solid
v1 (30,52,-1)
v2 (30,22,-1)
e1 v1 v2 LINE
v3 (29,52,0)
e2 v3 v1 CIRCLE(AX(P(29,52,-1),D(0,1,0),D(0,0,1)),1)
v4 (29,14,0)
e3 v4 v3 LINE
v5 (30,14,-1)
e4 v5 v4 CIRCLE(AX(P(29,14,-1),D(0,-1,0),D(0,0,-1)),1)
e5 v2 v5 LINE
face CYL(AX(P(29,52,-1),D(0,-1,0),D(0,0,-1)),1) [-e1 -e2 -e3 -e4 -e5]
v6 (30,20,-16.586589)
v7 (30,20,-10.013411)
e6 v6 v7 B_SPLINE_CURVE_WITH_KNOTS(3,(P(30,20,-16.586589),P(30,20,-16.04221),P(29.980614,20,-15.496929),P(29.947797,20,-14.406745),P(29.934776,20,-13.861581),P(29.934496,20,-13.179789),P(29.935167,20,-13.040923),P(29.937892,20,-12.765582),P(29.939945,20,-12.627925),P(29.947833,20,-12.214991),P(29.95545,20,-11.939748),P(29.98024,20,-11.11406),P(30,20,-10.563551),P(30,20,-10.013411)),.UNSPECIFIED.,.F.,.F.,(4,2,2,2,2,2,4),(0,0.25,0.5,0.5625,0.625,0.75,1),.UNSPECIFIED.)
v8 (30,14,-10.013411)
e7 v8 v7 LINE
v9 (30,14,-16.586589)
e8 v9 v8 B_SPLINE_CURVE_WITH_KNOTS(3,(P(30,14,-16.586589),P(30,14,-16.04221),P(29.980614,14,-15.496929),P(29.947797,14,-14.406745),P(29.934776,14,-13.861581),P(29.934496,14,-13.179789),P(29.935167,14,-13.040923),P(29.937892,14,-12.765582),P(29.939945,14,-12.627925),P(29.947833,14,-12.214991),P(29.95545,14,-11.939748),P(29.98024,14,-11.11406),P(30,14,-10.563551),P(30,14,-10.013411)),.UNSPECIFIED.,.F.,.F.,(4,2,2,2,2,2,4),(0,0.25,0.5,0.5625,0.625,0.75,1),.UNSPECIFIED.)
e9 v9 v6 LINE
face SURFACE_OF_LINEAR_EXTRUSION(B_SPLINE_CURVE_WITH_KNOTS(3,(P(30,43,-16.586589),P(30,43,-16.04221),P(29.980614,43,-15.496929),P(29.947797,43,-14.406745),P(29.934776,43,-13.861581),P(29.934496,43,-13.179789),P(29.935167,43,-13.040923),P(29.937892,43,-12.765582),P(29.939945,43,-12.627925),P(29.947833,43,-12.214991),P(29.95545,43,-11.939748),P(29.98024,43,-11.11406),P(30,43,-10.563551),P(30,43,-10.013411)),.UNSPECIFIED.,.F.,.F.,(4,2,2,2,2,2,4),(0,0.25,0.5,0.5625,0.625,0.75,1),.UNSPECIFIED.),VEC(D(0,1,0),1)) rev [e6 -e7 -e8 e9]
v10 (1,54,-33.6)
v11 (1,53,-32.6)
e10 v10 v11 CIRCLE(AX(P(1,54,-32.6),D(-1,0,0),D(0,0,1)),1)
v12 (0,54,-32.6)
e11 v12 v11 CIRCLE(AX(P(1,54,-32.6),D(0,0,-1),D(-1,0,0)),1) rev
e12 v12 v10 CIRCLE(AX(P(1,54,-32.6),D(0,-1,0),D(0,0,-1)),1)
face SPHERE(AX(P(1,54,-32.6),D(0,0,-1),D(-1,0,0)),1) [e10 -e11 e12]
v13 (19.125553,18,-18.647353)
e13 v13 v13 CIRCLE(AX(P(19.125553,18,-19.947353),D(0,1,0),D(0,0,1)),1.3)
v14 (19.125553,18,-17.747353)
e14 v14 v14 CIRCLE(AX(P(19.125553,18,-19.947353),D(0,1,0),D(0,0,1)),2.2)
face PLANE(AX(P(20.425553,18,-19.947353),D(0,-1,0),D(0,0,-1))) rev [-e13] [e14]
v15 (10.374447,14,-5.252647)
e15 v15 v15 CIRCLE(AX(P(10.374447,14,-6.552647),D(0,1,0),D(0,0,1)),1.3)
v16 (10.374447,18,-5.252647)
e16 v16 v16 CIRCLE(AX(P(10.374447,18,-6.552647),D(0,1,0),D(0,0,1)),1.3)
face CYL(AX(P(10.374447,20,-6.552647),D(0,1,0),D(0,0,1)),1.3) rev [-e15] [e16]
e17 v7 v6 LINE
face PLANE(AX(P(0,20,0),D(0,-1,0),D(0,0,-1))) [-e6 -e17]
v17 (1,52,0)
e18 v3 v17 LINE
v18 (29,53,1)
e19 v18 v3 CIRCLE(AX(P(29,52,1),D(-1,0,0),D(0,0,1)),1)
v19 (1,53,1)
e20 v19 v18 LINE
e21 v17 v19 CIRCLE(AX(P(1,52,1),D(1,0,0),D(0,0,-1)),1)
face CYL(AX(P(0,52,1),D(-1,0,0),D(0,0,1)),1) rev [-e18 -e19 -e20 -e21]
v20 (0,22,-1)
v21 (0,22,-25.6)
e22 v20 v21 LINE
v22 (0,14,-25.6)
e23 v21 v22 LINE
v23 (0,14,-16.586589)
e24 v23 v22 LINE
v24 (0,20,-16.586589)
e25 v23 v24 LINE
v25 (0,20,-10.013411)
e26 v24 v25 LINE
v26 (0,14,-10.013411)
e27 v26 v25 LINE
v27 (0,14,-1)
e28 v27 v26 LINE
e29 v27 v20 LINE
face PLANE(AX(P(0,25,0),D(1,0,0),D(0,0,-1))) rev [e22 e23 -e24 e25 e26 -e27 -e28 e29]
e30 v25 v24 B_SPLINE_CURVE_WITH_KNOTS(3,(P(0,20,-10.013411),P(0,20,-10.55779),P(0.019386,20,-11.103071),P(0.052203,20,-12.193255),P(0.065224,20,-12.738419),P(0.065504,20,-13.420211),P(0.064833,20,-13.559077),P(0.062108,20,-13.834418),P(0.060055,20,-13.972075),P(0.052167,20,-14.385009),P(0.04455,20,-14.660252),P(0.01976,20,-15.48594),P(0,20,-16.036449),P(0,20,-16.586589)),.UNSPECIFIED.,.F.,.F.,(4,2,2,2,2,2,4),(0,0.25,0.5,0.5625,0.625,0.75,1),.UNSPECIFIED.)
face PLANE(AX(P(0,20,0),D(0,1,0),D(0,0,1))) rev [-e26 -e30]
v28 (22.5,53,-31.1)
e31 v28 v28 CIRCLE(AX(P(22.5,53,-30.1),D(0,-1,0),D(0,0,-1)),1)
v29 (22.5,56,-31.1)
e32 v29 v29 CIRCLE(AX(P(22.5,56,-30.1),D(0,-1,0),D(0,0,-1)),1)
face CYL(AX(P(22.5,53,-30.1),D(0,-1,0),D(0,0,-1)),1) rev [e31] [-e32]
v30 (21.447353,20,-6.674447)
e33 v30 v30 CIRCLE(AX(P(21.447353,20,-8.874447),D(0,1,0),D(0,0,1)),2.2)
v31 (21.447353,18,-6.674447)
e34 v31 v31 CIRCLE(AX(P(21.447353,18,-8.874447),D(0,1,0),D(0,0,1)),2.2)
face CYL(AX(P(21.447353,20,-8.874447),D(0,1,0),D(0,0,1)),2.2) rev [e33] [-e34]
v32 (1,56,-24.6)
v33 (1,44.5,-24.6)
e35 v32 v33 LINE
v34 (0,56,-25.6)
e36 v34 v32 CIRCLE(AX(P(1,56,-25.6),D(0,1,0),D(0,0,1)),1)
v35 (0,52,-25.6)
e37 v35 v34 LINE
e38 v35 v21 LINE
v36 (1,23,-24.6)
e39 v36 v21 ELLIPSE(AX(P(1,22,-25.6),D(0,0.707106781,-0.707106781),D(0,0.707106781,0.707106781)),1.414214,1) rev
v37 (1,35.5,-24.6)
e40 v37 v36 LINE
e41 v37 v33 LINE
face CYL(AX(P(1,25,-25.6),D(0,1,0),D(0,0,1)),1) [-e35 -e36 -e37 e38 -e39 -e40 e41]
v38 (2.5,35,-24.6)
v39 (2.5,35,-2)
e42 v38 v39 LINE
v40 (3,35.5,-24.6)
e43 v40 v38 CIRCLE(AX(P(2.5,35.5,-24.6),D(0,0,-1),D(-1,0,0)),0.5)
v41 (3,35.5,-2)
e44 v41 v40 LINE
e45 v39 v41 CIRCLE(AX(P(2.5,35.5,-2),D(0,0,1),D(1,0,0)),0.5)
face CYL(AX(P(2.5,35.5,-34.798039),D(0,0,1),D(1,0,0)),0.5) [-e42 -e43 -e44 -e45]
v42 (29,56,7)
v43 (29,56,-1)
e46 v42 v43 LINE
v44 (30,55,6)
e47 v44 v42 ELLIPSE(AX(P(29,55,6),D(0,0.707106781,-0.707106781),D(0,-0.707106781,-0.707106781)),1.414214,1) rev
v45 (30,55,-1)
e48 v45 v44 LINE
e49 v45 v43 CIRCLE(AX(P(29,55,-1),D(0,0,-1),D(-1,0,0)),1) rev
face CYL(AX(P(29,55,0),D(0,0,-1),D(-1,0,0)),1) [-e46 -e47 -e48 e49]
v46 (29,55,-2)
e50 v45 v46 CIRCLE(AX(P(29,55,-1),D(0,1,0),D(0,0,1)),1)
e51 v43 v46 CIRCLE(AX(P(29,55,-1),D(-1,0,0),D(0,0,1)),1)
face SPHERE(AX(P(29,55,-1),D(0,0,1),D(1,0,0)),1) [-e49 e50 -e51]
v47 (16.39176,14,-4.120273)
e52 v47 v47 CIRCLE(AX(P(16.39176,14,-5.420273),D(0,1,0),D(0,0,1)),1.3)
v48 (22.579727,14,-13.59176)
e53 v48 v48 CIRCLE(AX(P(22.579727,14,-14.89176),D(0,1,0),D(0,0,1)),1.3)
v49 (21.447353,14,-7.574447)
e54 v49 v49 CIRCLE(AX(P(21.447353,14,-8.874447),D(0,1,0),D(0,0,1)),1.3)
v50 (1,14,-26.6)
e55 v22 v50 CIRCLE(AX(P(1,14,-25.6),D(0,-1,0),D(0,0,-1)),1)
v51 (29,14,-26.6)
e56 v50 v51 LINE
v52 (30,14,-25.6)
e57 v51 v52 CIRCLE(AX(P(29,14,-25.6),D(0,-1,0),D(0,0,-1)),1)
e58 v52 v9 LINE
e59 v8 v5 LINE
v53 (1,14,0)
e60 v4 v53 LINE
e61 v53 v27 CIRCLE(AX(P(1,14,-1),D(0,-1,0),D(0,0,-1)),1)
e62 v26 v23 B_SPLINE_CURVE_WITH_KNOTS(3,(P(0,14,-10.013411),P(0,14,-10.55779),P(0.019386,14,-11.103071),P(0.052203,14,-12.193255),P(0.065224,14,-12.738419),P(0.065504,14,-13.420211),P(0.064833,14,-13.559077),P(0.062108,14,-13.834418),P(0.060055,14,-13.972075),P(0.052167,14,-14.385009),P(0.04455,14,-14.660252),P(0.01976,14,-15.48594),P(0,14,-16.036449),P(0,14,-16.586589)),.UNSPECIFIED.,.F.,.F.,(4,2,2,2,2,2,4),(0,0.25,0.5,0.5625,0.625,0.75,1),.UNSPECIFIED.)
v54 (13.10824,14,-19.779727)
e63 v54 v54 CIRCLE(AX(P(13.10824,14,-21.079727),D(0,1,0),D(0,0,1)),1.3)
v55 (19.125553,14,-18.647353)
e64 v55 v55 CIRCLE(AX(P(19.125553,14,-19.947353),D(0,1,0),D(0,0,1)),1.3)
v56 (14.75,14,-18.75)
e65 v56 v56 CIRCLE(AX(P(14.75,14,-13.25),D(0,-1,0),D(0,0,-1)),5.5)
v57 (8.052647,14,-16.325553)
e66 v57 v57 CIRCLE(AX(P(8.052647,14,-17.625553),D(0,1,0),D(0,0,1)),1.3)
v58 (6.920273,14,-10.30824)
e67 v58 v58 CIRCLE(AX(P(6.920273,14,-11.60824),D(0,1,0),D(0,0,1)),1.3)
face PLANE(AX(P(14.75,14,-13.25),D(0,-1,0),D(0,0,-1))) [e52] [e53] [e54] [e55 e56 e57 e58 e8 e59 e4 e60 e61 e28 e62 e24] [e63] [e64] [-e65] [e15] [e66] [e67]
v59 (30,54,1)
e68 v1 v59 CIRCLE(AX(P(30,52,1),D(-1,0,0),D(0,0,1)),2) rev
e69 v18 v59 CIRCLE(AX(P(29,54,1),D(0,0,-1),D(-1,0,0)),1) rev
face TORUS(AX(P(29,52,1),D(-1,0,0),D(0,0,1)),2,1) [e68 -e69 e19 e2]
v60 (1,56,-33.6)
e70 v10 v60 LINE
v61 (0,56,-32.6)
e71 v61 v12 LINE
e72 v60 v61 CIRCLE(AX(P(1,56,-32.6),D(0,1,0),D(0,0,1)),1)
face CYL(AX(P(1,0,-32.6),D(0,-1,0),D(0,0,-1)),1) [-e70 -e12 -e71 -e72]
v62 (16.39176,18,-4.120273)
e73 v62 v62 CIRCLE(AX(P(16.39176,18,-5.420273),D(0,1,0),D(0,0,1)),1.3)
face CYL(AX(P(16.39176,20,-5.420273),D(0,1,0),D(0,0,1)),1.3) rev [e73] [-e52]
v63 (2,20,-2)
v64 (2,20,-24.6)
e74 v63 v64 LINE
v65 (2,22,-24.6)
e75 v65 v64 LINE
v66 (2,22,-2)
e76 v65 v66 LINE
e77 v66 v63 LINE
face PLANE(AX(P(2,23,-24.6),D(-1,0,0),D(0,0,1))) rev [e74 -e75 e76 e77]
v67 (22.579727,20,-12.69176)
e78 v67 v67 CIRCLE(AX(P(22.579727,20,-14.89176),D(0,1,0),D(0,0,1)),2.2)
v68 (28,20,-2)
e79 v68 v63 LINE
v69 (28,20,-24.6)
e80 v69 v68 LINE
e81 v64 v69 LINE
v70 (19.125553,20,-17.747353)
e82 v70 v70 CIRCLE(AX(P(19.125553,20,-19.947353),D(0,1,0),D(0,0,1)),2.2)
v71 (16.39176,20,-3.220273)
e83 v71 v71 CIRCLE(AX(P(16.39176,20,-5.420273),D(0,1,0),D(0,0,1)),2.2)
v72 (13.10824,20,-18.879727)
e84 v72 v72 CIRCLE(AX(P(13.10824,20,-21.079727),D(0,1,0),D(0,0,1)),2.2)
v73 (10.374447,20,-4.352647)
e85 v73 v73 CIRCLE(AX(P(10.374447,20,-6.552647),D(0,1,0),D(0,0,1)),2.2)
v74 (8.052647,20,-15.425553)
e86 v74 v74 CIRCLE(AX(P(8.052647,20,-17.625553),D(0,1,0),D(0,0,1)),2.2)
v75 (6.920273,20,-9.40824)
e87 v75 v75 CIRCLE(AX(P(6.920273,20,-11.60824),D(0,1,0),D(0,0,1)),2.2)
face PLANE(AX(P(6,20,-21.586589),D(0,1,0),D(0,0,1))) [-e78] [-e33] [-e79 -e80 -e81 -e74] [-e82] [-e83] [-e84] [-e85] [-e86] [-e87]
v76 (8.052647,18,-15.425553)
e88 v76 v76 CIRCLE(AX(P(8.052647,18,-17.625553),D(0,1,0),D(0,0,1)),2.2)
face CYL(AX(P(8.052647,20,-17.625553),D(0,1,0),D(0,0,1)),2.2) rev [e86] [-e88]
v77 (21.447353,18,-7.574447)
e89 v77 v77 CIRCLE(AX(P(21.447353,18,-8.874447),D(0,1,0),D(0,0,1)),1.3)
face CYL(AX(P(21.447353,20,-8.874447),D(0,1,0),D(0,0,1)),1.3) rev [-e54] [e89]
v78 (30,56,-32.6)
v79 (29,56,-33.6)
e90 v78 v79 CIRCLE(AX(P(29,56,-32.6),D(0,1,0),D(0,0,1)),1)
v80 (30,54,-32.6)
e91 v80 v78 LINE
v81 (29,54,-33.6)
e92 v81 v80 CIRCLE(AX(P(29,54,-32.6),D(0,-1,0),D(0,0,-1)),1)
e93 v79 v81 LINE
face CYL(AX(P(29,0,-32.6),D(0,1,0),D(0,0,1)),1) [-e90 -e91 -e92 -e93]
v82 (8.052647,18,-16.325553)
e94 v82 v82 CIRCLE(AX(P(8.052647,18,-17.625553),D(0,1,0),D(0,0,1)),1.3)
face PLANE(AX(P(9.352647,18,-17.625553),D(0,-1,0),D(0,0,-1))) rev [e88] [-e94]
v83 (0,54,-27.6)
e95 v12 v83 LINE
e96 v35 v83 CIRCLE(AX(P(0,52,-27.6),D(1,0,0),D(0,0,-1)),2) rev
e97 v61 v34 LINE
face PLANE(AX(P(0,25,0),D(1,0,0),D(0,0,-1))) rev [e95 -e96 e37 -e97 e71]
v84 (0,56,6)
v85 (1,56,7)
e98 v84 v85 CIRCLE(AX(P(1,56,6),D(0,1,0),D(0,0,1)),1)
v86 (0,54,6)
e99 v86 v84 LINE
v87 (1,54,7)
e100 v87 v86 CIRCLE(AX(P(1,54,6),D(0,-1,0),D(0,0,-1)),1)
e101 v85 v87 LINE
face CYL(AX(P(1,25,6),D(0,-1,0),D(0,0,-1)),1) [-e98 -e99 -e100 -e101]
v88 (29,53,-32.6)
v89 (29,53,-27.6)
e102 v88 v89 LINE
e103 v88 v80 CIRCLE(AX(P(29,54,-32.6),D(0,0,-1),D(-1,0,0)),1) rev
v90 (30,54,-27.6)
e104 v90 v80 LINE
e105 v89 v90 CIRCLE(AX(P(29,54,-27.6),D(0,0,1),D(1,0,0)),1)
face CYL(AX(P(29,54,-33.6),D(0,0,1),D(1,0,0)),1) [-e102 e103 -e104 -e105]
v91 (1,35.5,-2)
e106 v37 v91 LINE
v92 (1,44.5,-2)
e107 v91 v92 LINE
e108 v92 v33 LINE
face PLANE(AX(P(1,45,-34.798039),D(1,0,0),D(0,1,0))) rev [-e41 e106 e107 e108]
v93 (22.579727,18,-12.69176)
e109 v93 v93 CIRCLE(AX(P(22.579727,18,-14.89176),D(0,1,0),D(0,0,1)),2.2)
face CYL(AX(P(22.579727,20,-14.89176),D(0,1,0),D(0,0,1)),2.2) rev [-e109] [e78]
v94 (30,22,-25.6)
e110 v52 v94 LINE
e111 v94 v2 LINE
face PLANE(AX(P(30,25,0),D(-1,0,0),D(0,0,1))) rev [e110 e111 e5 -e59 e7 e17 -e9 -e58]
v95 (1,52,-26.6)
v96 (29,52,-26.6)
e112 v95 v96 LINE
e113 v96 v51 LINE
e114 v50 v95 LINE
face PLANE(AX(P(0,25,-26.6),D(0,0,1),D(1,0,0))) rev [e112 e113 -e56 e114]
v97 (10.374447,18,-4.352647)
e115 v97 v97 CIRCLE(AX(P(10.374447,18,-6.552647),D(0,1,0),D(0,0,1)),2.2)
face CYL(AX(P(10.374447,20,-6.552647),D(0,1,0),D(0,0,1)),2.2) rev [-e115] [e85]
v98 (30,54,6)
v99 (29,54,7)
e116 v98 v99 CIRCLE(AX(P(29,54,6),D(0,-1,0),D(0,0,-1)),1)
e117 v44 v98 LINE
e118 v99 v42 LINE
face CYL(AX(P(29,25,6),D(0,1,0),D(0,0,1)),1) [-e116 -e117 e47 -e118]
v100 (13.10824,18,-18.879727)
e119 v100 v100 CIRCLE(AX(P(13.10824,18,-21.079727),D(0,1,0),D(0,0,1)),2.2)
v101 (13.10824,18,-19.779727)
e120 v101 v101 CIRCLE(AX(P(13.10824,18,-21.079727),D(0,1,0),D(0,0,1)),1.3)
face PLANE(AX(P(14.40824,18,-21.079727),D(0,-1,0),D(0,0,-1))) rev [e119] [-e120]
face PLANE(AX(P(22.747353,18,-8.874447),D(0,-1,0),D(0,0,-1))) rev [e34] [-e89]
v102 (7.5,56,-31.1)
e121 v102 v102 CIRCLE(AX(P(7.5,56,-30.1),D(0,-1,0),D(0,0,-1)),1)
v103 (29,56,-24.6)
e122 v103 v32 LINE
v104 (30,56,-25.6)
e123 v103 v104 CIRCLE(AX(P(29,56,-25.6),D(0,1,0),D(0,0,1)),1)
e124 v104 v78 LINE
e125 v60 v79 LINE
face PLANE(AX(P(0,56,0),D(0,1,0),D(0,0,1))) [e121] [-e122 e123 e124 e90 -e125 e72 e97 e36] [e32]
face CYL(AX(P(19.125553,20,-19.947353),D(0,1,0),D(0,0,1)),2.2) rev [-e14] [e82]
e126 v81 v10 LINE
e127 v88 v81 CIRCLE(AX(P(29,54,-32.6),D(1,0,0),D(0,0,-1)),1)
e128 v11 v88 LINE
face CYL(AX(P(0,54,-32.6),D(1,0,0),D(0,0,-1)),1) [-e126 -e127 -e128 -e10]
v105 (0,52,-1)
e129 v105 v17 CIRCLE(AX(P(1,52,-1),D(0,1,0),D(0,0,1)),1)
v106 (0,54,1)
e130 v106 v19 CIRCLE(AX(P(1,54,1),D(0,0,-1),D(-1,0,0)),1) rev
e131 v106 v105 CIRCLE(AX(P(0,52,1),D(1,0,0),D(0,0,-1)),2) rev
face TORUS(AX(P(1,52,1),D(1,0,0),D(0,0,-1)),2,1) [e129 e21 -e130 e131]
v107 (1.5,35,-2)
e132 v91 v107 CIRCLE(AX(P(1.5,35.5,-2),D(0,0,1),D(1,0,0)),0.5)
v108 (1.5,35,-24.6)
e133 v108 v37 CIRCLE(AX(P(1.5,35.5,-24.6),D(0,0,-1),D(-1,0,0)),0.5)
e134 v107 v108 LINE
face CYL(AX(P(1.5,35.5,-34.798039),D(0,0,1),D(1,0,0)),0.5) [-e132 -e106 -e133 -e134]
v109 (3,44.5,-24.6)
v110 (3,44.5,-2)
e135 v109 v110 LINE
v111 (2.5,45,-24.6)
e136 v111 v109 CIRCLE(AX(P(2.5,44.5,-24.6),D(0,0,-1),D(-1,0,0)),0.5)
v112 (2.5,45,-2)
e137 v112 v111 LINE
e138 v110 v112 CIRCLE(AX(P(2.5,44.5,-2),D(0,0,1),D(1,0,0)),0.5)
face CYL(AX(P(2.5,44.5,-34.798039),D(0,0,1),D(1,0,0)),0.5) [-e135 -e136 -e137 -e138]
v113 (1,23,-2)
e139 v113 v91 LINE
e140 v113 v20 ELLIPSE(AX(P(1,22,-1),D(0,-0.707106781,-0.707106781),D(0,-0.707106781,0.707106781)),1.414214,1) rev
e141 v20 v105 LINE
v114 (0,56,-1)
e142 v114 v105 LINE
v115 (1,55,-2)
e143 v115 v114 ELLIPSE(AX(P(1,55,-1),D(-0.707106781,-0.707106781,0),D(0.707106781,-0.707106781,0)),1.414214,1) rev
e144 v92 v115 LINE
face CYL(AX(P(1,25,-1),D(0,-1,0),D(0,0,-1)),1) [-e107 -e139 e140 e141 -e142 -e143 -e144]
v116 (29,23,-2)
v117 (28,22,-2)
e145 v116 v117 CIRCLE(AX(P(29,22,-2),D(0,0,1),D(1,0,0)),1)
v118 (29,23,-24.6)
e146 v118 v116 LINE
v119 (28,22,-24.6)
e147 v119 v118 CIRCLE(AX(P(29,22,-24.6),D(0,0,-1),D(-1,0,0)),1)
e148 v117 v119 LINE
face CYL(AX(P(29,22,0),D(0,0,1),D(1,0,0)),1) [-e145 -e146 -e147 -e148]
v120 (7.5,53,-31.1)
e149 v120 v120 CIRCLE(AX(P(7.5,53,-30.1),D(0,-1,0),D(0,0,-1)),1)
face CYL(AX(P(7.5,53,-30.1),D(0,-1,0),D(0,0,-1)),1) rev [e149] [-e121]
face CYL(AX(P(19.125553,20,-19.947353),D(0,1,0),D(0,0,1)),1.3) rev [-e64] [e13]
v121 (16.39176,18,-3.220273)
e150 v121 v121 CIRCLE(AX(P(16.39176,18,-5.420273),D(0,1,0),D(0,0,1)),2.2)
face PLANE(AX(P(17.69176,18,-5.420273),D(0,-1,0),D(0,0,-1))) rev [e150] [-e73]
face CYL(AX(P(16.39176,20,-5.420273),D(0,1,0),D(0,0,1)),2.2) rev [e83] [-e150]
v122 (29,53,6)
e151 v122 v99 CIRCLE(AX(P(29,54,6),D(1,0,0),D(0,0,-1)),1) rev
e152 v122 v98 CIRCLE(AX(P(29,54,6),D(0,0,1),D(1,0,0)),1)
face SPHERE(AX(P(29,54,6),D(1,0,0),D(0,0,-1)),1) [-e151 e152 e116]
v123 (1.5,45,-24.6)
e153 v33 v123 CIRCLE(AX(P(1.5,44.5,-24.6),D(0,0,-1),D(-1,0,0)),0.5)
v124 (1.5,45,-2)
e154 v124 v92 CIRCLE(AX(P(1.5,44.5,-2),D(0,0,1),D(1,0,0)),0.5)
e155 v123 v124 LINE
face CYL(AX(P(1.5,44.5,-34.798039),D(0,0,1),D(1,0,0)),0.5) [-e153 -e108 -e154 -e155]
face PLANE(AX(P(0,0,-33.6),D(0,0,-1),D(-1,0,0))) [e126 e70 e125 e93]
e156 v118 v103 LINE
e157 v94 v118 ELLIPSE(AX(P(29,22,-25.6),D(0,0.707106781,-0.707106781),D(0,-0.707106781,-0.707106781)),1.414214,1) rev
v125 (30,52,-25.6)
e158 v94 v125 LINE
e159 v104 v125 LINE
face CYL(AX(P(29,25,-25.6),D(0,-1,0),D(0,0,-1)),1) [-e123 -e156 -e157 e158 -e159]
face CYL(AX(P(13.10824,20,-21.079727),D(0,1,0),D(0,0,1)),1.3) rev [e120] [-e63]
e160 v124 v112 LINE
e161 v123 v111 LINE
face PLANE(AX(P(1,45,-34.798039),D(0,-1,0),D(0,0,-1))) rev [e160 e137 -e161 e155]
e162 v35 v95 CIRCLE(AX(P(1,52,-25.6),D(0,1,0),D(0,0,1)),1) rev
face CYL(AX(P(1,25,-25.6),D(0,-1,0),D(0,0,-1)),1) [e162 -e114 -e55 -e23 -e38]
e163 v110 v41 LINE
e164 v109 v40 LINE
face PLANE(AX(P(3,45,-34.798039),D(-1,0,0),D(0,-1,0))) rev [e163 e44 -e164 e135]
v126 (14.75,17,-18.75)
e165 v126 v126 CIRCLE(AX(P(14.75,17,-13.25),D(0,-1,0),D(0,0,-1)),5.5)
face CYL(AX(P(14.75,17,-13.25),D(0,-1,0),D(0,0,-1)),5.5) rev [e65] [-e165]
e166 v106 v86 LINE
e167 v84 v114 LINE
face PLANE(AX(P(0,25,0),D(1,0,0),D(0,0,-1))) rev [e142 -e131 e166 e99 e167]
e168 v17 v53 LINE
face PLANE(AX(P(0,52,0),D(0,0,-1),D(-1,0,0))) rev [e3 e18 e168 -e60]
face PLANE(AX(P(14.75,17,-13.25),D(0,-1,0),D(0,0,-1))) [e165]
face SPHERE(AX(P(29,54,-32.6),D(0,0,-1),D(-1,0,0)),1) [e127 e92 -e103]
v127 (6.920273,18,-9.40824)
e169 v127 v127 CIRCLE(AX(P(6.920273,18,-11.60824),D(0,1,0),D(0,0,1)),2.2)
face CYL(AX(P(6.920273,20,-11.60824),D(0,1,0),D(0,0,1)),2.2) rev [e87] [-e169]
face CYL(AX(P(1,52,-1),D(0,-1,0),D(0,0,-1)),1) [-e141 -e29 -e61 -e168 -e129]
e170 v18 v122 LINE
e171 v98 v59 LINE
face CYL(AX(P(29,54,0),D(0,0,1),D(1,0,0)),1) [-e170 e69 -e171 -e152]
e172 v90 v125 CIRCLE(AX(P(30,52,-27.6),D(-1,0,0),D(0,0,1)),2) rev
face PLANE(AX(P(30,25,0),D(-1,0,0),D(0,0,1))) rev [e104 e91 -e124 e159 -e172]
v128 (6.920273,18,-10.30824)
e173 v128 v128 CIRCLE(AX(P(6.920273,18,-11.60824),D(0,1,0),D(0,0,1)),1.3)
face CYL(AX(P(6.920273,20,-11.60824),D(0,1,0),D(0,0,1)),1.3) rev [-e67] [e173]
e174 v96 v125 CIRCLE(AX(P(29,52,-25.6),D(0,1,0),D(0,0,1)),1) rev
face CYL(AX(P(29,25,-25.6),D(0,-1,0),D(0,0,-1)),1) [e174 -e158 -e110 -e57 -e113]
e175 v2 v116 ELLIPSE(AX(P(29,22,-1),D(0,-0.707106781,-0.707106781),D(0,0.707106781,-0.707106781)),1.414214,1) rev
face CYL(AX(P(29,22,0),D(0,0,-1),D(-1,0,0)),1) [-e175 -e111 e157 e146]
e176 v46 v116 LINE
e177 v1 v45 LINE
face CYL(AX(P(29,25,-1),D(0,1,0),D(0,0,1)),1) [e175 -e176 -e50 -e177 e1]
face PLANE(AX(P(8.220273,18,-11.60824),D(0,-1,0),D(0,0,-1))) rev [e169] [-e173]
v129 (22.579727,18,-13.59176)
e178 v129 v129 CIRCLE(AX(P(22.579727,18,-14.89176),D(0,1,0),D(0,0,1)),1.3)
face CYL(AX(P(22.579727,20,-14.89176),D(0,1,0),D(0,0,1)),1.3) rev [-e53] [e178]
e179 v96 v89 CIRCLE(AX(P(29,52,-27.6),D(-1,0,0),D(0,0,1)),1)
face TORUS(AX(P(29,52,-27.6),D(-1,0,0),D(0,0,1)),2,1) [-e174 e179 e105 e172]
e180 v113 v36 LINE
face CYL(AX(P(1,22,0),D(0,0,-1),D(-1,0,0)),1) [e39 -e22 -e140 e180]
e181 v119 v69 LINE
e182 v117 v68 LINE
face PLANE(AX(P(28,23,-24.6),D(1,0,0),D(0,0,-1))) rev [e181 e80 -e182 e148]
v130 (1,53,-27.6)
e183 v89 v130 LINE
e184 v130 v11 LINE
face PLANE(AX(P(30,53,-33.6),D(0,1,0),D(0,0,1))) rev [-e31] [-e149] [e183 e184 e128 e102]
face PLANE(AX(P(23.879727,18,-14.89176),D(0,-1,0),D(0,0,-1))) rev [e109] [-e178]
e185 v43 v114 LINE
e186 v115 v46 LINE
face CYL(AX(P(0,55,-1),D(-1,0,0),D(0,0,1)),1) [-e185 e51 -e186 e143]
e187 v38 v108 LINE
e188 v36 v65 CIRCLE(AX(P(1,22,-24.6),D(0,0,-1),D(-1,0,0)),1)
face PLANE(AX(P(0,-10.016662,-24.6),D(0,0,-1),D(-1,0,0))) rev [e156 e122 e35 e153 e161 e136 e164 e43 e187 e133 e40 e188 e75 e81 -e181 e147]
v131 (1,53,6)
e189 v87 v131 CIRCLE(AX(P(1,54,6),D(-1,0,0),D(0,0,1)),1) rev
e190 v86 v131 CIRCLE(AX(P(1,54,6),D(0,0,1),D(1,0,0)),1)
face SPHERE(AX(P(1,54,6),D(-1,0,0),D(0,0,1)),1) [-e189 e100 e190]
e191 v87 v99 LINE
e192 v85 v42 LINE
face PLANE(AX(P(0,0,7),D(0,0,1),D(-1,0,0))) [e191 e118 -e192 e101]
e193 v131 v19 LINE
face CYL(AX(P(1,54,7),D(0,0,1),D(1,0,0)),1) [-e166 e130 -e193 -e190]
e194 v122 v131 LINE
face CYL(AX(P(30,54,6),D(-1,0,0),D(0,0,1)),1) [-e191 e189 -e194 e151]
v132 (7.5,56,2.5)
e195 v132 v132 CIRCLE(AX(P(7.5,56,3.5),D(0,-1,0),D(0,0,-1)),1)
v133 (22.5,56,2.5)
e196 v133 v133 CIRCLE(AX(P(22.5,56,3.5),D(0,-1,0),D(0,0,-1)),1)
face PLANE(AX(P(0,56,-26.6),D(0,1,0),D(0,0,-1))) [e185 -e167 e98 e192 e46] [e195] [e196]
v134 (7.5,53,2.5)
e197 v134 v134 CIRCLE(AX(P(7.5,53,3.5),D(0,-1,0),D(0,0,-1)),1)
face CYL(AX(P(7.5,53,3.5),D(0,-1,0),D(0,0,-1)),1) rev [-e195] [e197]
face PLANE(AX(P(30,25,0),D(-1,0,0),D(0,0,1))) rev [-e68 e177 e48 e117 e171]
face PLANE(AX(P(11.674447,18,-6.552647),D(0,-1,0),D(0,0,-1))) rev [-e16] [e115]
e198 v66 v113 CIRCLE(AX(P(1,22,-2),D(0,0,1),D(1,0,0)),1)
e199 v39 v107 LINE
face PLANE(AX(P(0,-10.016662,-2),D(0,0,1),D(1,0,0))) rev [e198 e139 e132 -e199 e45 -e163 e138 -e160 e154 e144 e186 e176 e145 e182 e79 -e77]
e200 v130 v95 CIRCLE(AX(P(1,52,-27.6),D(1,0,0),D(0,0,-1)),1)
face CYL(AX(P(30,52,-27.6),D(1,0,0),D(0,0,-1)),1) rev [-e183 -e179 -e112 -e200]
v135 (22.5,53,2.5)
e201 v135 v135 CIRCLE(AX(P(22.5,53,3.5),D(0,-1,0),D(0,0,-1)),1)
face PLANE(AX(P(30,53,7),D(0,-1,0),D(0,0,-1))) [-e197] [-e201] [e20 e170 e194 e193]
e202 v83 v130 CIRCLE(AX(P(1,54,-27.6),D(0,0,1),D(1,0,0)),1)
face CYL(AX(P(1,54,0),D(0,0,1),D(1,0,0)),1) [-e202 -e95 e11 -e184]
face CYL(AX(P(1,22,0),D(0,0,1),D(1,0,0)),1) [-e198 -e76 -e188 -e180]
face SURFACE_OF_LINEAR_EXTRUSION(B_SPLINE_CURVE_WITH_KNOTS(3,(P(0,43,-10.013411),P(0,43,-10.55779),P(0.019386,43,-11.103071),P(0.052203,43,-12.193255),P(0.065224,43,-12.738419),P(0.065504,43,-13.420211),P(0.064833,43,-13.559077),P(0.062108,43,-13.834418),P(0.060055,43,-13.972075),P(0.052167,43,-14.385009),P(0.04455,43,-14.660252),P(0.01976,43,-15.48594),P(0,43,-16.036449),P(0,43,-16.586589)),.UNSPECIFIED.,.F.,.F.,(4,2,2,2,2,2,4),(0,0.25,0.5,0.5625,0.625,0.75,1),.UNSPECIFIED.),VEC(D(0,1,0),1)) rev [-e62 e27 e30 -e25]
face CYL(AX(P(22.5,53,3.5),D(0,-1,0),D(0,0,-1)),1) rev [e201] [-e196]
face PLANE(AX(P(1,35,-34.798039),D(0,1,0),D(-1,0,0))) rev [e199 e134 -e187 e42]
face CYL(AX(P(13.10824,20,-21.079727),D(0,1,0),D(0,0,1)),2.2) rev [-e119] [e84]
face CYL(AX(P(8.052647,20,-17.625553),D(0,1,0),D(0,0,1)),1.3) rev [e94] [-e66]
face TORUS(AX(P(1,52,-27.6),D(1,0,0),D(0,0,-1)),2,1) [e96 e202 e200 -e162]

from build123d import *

# Parameters (mm, degrees)
SKETCH2_W                     = 30
SKETCH2_H                     = 26.6
BOSS_EXTRUDE1_DEPTH           = 25
SKETCH4_W                     = 30
SKETCH4_H                     = 3
BOSS_EXTRUDE2_DEPTH           = 31
SKETCH5_W                     = 30
SKETCH5_H                     = 3
BOSS_EXTRUDE3_DEPTH           = 7
F_2_0_2_DIAMETER_HOLE1_D      = 2
SKETCH10_W                    = 20.2
SKETCH10_H                    = 20.2
CUT_EXTRUDE1_DEPTH            = 20
F_5_0_5_DIAMETER_HOLE1_D      = 5
F_5_0_5_DIAMETER_HOLE2_D      = 5
CUT_EXTRUDE2_DEPTH            = 72.867656147
FILLET1_R                     = 1
SKETCH21_W                    = 30
SKETCH21_H                    = 26.6
CUT_EXTRUDE3_DEPTH            = 20
BOSS_EXTRUDE4_DEPTH           = 4
SKETCH26_R                    = 6
BOSS_EXTRUDE6_DEPTH           = 18
SKETCH27_R                    = 5
BOSS_EXTRUDE7_DEPTH           = 5
SKETCH28_R                    = 11
BOSS_EXTRUDE8_DEPTH           = 6
CBORE_FOR_M2_SHCS1_AT_2_COUNT = 2
CBORE_FOR_M2_SHCS1_AT_2_PITCH = 6.122934918
CBORE_FOR_M2_SHCS1_AT_3_COUNT = 2
CBORE_FOR_M2_SHCS1_AT_3_PITCH = 11.313708499
CBORE_FOR_M2_SHCS1_AT_4_COUNT = 2
CBORE_FOR_M2_SHCS1_AT_4_PITCH = 14.78207252
CBORE_FOR_M2_SHCS1_AT_5_COUNT = 2
CBORE_FOR_M2_SHCS1_AT_5_PITCH = 16
CBORE_FOR_M2_SHCS1_AT_6_COUNT = 2
CBORE_FOR_M2_SHCS1_AT_6_PITCH = 14.78207252
CBORE_FOR_M2_SHCS1_AT_7_COUNT = 2
CBORE_FOR_M2_SHCS1_AT_7_PITCH = 11.313708499
CBORE_FOR_M2_SHCS1_AT_8_COUNT = 2
CBORE_FOR_M2_SHCS1_AT_8_PITCH = 6.122934918
SKETCH49_R                    = 11
BOSS_EXTRUDE11_DEPTH          = 29
SKETCH50_W                    = 18
SKETCH50_H                    = 20
CUT_EXTRUDE9_DEPTH            = 72.867656266
SKETCH52_W                    = 16.573178866
SKETCH52_H                    = 20
CUT_EXTRUDE10_DEPTH           = 72.867656266
SKETCH53_R                    = 3.75
BOSS_EXTRUDE12_DEPTH          = 20
SKETCH54_R                    = 11
SKETCH54_R_2                  = 6
BOSS_EXTRUDE13_DEPTH          = 3
SKETCH55_R                    = 5.5
CUT_EXTRUDE11_DEPTH           = 3
SKETCH56_W                    = 26.6
SKETCH56_H                    = 32
CUT_EXTRUDE12_DEPTH           = 72.867656266
BOSS_EXTRUDE15_DEPTH          = 5
BOSS_EXTRUDE16_DEPTH          = 5
SKETCH60_W                    = 30
SKETCH60_H                    = 1
CUT_EXTRUDE13_DEPTH           = 36
SKETCH61_W                    = 2
SKETCH61_H                    = 22.6
BOSS_EXTRUDE17_DEPTH          = 3
FILLET8_R                     = 1
BOSS_EXTRUDE18_REACH          = 72.955
SKETCH62_W                    = 2
SKETCH62_H                    = 10
FILLET9_R                     = 0.5


with BuildPart() as part:
    # Sketch2 → Boss-Extrude1 (new body)
    with BuildSketch(Plane(origin=(0, 0, 0), x_dir=(1, 0, 0), z_dir=(0, 1, 0))):
        with Locations((15, 13.3)):
            Rectangle(SKETCH2_W, SKETCH2_H)
    extrude(amount=BOSS_EXTRUDE1_DEPTH)

    # Sketch4 → Boss-Extrude2 (add)
    with BuildSketch(Plane(origin=(0, 25, 0), x_dir=(1, 0, 0), z_dir=(0, 1, 0))):
        with Locations((15, 25.1)):
            Rectangle(SKETCH4_W, SKETCH4_H)
    boss_extrude2 = extrude(amount=BOSS_EXTRUDE2_DEPTH)

    # Sketch5 → Boss-Extrude3 (add)
    with BuildSketch(Plane(origin=(0, 0, -26.6), x_dir=(-1, 0, 0), z_dir=(0, 0, -1))):
        with Locations((-15, 54.5)):
            Rectangle(SKETCH5_W, SKETCH5_H)
    boss_extrude3 = extrude(amount=BOSS_EXTRUDE3_DEPTH)

    # Ø2.0 (2) Diameter Hole1 (through all)
    with Locations(Plane(origin=(0, 53, 0), x_dir=(-1, 0, 0), z_dir=(0, -1, 0))):
        with Locations((-22.5, 30.1), (-7.5, 30.1)):
            f_2_0_2_diameter_hole1 = Hole(F_2_0_2_DIAMETER_HOLE1_D / 2)

    # Mirror2: Boss-Extrude2, Boss-Extrude3, Ø2.0 (2) Diameter Hole1 across plane
    add(boss_extrude2.mirror(Plane.XY.offset(-13.3)))
    add(boss_extrude3.mirror(Plane.XY.offset(-13.3)))
    add(f_2_0_2_diameter_hole1.mirror(Plane.XY.offset(-13.3)), mode=Mode.SUBTRACT)

    # Sketch10 → Cut-Extrude1 (cut)
    with BuildSketch(Plane.XZ):
        with Locations((15, -13.3)):
            Rectangle(SKETCH10_W, SKETCH10_H)
    extrude(amount=-CUT_EXTRUDE1_DEPTH, mode=Mode.SUBTRACT)

    # Ø5.0 (5) Diameter Hole1 (through all)
    with Locations(Plane(origin=(0, 0, -26.6), x_dir=(-1, 0, 0), z_dir=(0, 0, -1))):
        with Locations((-15, 10)):
            Hole(F_5_0_5_DIAMETER_HOLE1_D / 2)

    # Ø5.0 (5) Diameter Hole2 (through all)
    with Locations(Plane(origin=(30, 0, 0), x_dir=(0, 0, -1), z_dir=(1, 0, 0))):
        with Locations((13.3, 10)):
            Hole(F_5_0_5_DIAMETER_HOLE2_D / 2)

    # Sketch14 → Cut-Extrude2 (cut, through all)
    with BuildSketch(Plane(origin=(30, 0, 0), x_dir=(0, 0, -1), z_dir=(1, 0, 0))):
        with BuildLine():
            Line((3, 25), (23.6, 25))
            ThreePointArc((23.6, 25), (13.3, 20.644164949), (3, 25))
        make_face()
    extrude(amount=-CUT_EXTRUDE2_DEPTH, mode=Mode.SUBTRACT)

    # Fillet1
    fillet1_edges = [part.edges().sort_by_distance(p)[0] for p in [
        (0, 20.644164949, -13.3),
        (30, 20.644164949, -13.3),
        (0, 40.5, -23.6),
        (30, 40.5, -23.6),
        (0, 26.5, -26.6),
        (30, 26.5, -26.6),
        (15, 53, -26.6),
        (30, 53, -30.1),
        (0, 53, -30.1),
        (30, 54.5, -33.6),
        (15, 53, -33.6),
        (0, 54.5, -33.6),
        (15, 0, -26.6),
        (0, 40.5, -3),
        (30, 56, 2),
        (30, 40.5, -3),
        (30, 0, -13.3),
        (15, 0, 0),
        (0, 0, -13.3),
        (30, 26.5, 0),
        (0, 26.5, 0),
        (30, 54.5, 7),
        (30, 53, 3.5),
        (0, 54.5, 7),
        (15, 53, 7),
        (0, 53, 3.5),
        (15, 53, 0),
        (4.9, 0, -13.3),
        (15, 0, -23.4),
        (25.1, 0, -13.3),
        (15, 0, -3.2),
    ]]
    fillet(fillet1_edges, radius=FILLET1_R)

    # Sketch21 → Cut-Extrude3 (cut)
    with BuildSketch(Plane.XZ):
        with Locations((15, -13.3)):
            Rectangle(SKETCH21_W, SKETCH21_H)
    extrude(amount=-CUT_EXTRUDE3_DEPTH, mode=Mode.SUBTRACT)

    # Sketch22 → Boss-Extrude4 (add)
    with BuildSketch(Plane.XZ.offset(-20)):
        with BuildLine():
            Line((30, -25.6), (30, -16.586589433))
            add(Edge.make_bspline(
                [(30, -16.586589433), (30, -16.042210126), (29.9806135, -15.496929185), (29.947797021, -14.406744617), (29.934775647, -13.861580973), (29.934496196, -13.179789366), (29.93516675, -13.040922925), (29.937892078, -12.76558201), (29.939945417, -12.627925453), (29.947832544, -12.214990537), (29.955450406, -11.939748084), (29.980239893, -11.114059681), (30, -10.563551364), (30, -10.013410567)],
                knots=[0, 0, 0, 0, 0.25, 0.25, 0.5, 0.5, 0.5625, 0.5625, 0.625, 0.625, 0.75, 0.75, 1, 1, 1, 1], degree=3))
            Line((30, -10.013410567), (30, -1))
            ThreePointArc((30, -1), (29.707106781, -0.292893219), (29, 0))
            Line((29, 0), (1, 0))
            ThreePointArc((1, 0), (0.292893219, -0.292893219), (0, -1))
            Line((0, -1), (0, -10.013410567))
            add(Edge.make_bspline(
                [(0, -10.013410567), (0, -10.557789874), (0.0193865, -11.103070815), (0.052202979, -12.193255383), (0.065224353, -12.738419027), (0.065503804, -13.420210634), (0.06483325, -13.559077075), (0.062107922, -13.83441799), (0.060054583, -13.972074547), (0.052167456, -14.385009463), (0.044549594, -14.660251916), (0.019760107, -15.485940319), (0, -16.036448636), (0, -16.586589433)],
                knots=[0, 0, 0, 0, 0.25, 0.25, 0.5, 0.5, 0.5625, 0.5625, 0.625, 0.625, 0.75, 0.75, 1, 1, 1, 1], degree=3))
            Line((0, -16.586589433), (0, -25.6))
            ThreePointArc((0, -25.6), (0.292893219, -26.307106781), (1, -26.6))
            Line((1, -26.6), (29, -26.6))
            ThreePointArc((29, -26.6), (29.707106781, -26.307106781), (30, -25.6))
        make_face()
    extrude(amount=BOSS_EXTRUDE4_DEPTH)

    # Sketch26 → Boss-Extrude6 (add)
    with BuildSketch(Plane.XZ.offset(-16)):
        with Locations(Location((14.75, -13.25, 0), (0, 0, 270))):
            Circle(SKETCH26_R)
    extrude(amount=BOSS_EXTRUDE6_DEPTH)

    # Sketch27 → Boss-Extrude7 (add)
    with BuildSketch(Plane.XZ.offset(2)):
        with Locations(Location((14.75, -13.25, 0), (0, 0, 270))):
            Circle(SKETCH27_R)
    extrude(amount=BOSS_EXTRUDE7_DEPTH)

    # Sketch28 → Boss-Extrude8 (add)
    with BuildSketch(Plane.XZ.offset(7)):
        with Locations(Location((14.75, -13.25, 0), (0, 0, 270))):
            Circle(SKETCH28_R)
    extrude(amount=BOSS_EXTRUDE8_DEPTH)

    # Sketch37 → CBORE for M2 SHCS1 (revolve, cut)
    with BuildSketch(Plane(origin=(8.052647165, -7, -17.625553109), x_dir=(0, 0, 1), z_dir=(1, 0, 0))):
        Polygon((0, 0), (0, 6), (1.3, 6), (1.3, 2), (2.2, 2), (2.2, 0), align=None)
    cbore_for_m2_shcs1 = revolve(axis=Axis((8.052647165, -0.65, -17.625553109), (0, -1, 0)), mode=Mode.SUBTRACT)

    # CBORE for M2 SHCS1 at 2: CBORE for M2 SHCS1 ×2
    with Locations(*[Vector(0.8256812413978046, 0, -0.5641369404708226) * (i * CBORE_FOR_M2_SHCS1_AT_2_PITCH) for i in range(1, CBORE_FOR_M2_SHCS1_AT_2_COUNT)]):
        add(cbore_for_m2_shcs1, mode=Mode.SUBTRACT)

    # CBORE for M2 SHCS1 at 3: CBORE for M2 SHCS1 ×2
    with Locations(*[Vector(0.978715860009591, 0, -0.20522004133535987) * (i * CBORE_FOR_M2_SHCS1_AT_3_PITCH) for i in range(1, CBORE_FOR_M2_SHCS1_AT_3_COUNT)]):
        add(cbore_for_m2_shcs1, mode=Mode.SUBTRACT)

    # CBORE for M2 SHCS1 at 4: CBORE for M2 SHCS1 ×2
    with Locations(*[Vector(0.9827498610154156, 0, 0.1849397487674874) * (i * CBORE_FOR_M2_SHCS1_AT_4_PITCH) for i in range(1, CBORE_FOR_M2_SHCS1_AT_4_COUNT)]):
        add(cbore_for_m2_shcs1, mode=Mode.SUBTRACT)

    # CBORE for M2 SHCS1 at 5: CBORE for M2 SHCS1 ×2
    with Locations(*[Vector(0.8371691043312223, 0, 0.5469441386039887) * (i * CBORE_FOR_M2_SHCS1_AT_5_PITCH) for i in range(1, CBORE_FOR_M2_SHCS1_AT_5_COUNT)]):
        add(cbore_for_m2_shcs1, mode=Mode.SUBTRACT)

    # CBORE for M2 SHCS1 at 6: CBORE for M2 SHCS1 ×2
    with Locations(*[Vector(0.56413694046925, 0, 0.8256812413988791) * (i * CBORE_FOR_M2_SHCS1_AT_6_PITCH) for i in range(1, CBORE_FOR_M2_SHCS1_AT_6_COUNT)]):
        add(cbore_for_m2_shcs1, mode=Mode.SUBTRACT)

    # CBORE for M2 SHCS1 at 7: CBORE for M2 SHCS1 ×2
    with Locations(*[Vector(0.20522004133536026, 0, 0.9787158600095909) * (i * CBORE_FOR_M2_SHCS1_AT_7_PITCH) for i in range(1, CBORE_FOR_M2_SHCS1_AT_7_COUNT)]):
        add(cbore_for_m2_shcs1, mode=Mode.SUBTRACT)

    # CBORE for M2 SHCS1 at 8: CBORE for M2 SHCS1 ×2
    with Locations(*[Vector(-0.18493974876935929, 0, 0.9827498610150633) * (i * CBORE_FOR_M2_SHCS1_AT_8_PITCH) for i in range(1, CBORE_FOR_M2_SHCS1_AT_8_COUNT)]):
        add(cbore_for_m2_shcs1, mode=Mode.SUBTRACT)

    # Sketch49 → Boss-Extrude11 (add)
    with BuildSketch(Plane.XZ.offset(-16)):
        with BuildLine():
            Line((30, -25.6), (30, -16.586589433))
            add(Edge.make_bspline(
                [(30, -16.586589433), (30, -16.042210126), (29.9806135, -15.496929185), (29.947797021, -14.406744617), (29.934775647, -13.861580973), (29.934496196, -13.179789366), (29.93516675, -13.040922925), (29.937892078, -12.76558201), (29.939945417, -12.627925453), (29.947832544, -12.214990537), (29.955450406, -11.939748084), (29.980239893, -11.114059681), (30, -10.563551364), (30, -10.013410567)],
                knots=[0, 0, 0, 0, 0.25, 0.25, 0.5, 0.5, 0.5625, 0.5625, 0.625, 0.625, 0.75, 0.75, 1, 1, 1, 1], degree=3))
            Line((30, -10.013410567), (30, -1))
            ThreePointArc((30, -1), (29.707106781, -0.292893219), (29, 0))
            Line((29, 0), (1, 0))
            ThreePointArc((1, 0), (0.292893219, -0.292893219), (0, -1))
            Line((0, -1), (0, -10.013410567))
            add(Edge.make_bspline(
                [(0, -10.013410567), (0, -10.557789874), (0.0193865, -11.103070815), (0.052202979, -12.193255383), (0.065224353, -12.738419027), (0.065503804, -13.420210634), (0.06483325, -13.559077075), (0.062107922, -13.83441799), (0.060054583, -13.972074547), (0.052167456, -14.385009463), (0.044549594, -14.660251916), (0.019760107, -15.485940319), (0, -16.036448636), (0, -16.586589433)],
                knots=[0, 0, 0, 0, 0.25, 0.25, 0.5, 0.5, 0.5625, 0.5625, 0.625, 0.625, 0.75, 0.75, 1, 1, 1, 1], degree=3))
            Line((0, -16.586589433), (0, -25.6))
            ThreePointArc((0, -25.6), (0.292893219, -26.307106781), (1, -26.6))
            Line((1, -26.6), (29, -26.6))
            ThreePointArc((29, -26.6), (29.707106781, -26.307106781), (30, -25.6))
        make_face()
        with Locations(Location((14.75, -13.25, 0), (0, 0, 270))):
            Circle(SKETCH49_R, mode=Mode.SUBTRACT)
    extrude(amount=BOSS_EXTRUDE11_DEPTH)

    # Sketch50 → Cut-Extrude9 (cut, through all)
    with BuildSketch(Plane(origin=(0, 0, -26.6), x_dir=(-1, 0, 0), z_dir=(0, 0, -1))):
        with Locations((-15, 3)):
            Rectangle(SKETCH50_W, SKETCH50_H)
    extrude(amount=-CUT_EXTRUDE9_DEPTH, mode=Mode.SUBTRACT)

    # Sketch52 → Cut-Extrude10 (cut, through all)
    with BuildSketch(Plane(origin=(30, 0, 0), x_dir=(0, 0, -1), z_dir=(1, 0, 0))):
        with Locations((13.3, 3)):
            Rectangle(SKETCH52_W, SKETCH52_H)
    extrude(amount=-CUT_EXTRUDE10_DEPTH, mode=Mode.SUBTRACT)

    # Sketch53 → Boss-Extrude12 (add)
    with BuildSketch(Plane.XZ.offset(-13)):
        with Locations(Location((14.75, -13.25, 0), (0, 0, 270))):
            Circle(SKETCH53_R)
    extrude(amount=BOSS_EXTRUDE12_DEPTH)

    # Sketch54 → Boss-Extrude13 (add)
    with BuildSketch(Plane.XZ.offset(-16)):
        with Locations((14.75, -13.25)):
            Circle(SKETCH54_R)
        with Locations((14.75, -13.25)):
            Circle(SKETCH54_R_2, mode=Mode.SUBTRACT)
    extrude(amount=BOSS_EXTRUDE13_DEPTH)

    # Sketch55 → Cut-Extrude11 (cut)
    with BuildSketch(Plane.XZ.offset(13)):
        with Locations(Location((14.75, -13.25, 0), (0, 0, 270))):
            Circle(SKETCH55_R)
    extrude(amount=-CUT_EXTRUDE11_DEPTH, mode=Mode.SUBTRACT)


with BuildPart() as body_2:
    # Split1: read off the stored shape, not the designer's step
    # Split1: the piece on the far side of the plane
    add(part.part)
    split(bisect_by=Plane(origin=(0, -7, 0), x_dir=(1, 0, 0), z_dir=(0, 1, 0)), keep=Keep.BOTTOM)


with BuildPart() as part_1:
    add(part.part)

    # Split1
    split(bisect_by=Plane(origin=(0, -7, 0), x_dir=(1, 0, 0), z_dir=(0, 1, 0)), keep=Keep.TOP)

    # Sketch56 → Cut-Extrude12 (cut, through all)
    with BuildSketch(Plane.ZY):
        with Locations((-13.3, 9)):
            Rectangle(SKETCH56_W, SKETCH56_H)
    extrude(amount=-CUT_EXTRUDE12_DEPTH, mode=Mode.SUBTRACT)


with BuildPart() as cut_extrude12_piece_1:
    # of the separate pieces the step leaves, piece 1, a body of its own (cut_extrude12_pieces)
    add(part_1.part.solids().sort_by_distance((1, 52, -26.6))[0])

    # Sketch57 → Boss-Extrude15 (add)
    with BuildSketch(Plane.XZ.offset(-25)):
        with BuildLine():
            Line((0, -24.6), (0, -25.6))
            ThreePointArc((0, -25.6), (0.292893219, -26.307106781), (1, -26.6))
            Line((1, -26.6), (29, -26.6))
            ThreePointArc((29, -26.6), (29.707106781, -26.307106781), (30, -25.6))
            Line((30, -25.6), (30, -24.6))
            ThreePointArc((30, -24.6), (29.707106781, -23.892893219), (29, -23.6))
            Line((29, -23.6), (1, -23.6))
            ThreePointArc((1, -23.6), (0.292893219, -23.892893219), (0, -24.6))
        make_face()
    extrude(amount=BOSS_EXTRUDE15_DEPTH)


with BuildPart() as cut_extrude12_piece_2:
    # of the separate pieces the step leaves, piece 2, a body of its own (cut_extrude12_pieces)
    add(part_1.part.solids().sort_by_distance((0, 52, -1))[0])

    # Sketch59 → Boss-Extrude16 (add)
    with BuildSketch(Plane.XZ.offset(-25)):
        with BuildLine():
            Line((1, -3), (29, -3))
            ThreePointArc((29, -3), (29.707106781, -2.707106781), (30, -2))
            Line((30, -2), (30, -1))
            ThreePointArc((30, -1), (29.707106781, -0.292893219), (29, 0))
            Line((29, 0), (1, 0))
            ThreePointArc((1, 0), (0.292893219, -0.292893219), (0, -1))
            Line((0, -1), (0, -2))
            ThreePointArc((0, -2), (0.292893219, -2.707106781), (1, -3))
        make_face()
    extrude(amount=BOSS_EXTRUDE16_DEPTH)


with BuildPart() as body_2_1:
    # Body-Move/Copy1: read off the stored shape, not the designer's step
    # Body-Move/Copy1: moved
    add(body_2.part.moved(Location((0, 27, 0))))

    # Combine3: union Cut-Extrude12 piece 1, Cut-Extrude12 piece 2
    add(cut_extrude12_piece_1.part)
    add(cut_extrude12_piece_2.part)

    # Sketch60 → Cut-Extrude13 (cut)
    with BuildSketch(Plane(origin=(0, 56, 0), x_dir=(1, 0, 0), z_dir=(0, 1, 0))):
        with Locations((15, 2.5)):
            Rectangle(SKETCH60_W, SKETCH60_H)
        with Locations((15, 24.1)):
            Rectangle(SKETCH60_W, SKETCH60_H)
    extrude(amount=-CUT_EXTRUDE13_DEPTH, mode=Mode.SUBTRACT)

    # Sketch61 → Boss-Extrude17 (add)
    with BuildSketch(Plane(origin=(0, 20, 0), x_dir=(1, 0, 0), z_dir=(0, 1, 0))):
        with Locations((1, 13.3)):
            Rectangle(SKETCH61_W, SKETCH61_H)
        with Locations((29, 13.3)):
            Rectangle(SKETCH61_W, SKETCH61_H)
    extrude(amount=BOSS_EXTRUDE17_DEPTH)

    # Fillet8
    fillet8_edges = [body_2_1.edges().sort_by_distance(p)[0] for p in [
        (14.5, 56, -2),
        (29.707106781, 55.707106781, -2),
        (30, 23, -13.3),
        (30, 39.5, -24.6),
        (30, 39, -2),
        (0, 39.5, -2),
        (0, 39.5, -24.6),
        (0, 23, -13.3),
        (2, 23, -13.3),
        (28, 23, -13.3),
    ]]
    fillet(fillet8_edges, radius=FILLET8_R - 0.0001)  # a hair under: the kernel refuses the full size

    # Boss-Extrude18: up to this face of the body (flat: up to its plane)
    boss_extrude18_end = Plane(body_2_1.part.faces().sort_by_distance((15, 38.09225259, -24.6))[0])
    # Sketch62 → Boss-Extrude18 (add, up to the picked face)
    with BuildSketch(Plane(origin=(0, 0, -2), x_dir=(-1, 0, 0), z_dir=(0, 0, -1)), mode=Mode.PRIVATE) as boss_extrude18_sk1:
        with Locations((-2, 40)):
            Rectangle(SKETCH62_W, SKETCH62_H)
    boss_extrude18_tool1 = split(extrude(boss_extrude18_sk1.sketch, amount=BOSS_EXTRUDE18_REACH, mode=Mode.PRIVATE), bisect_by=boss_extrude18_end, keep=Keep.BOTH, mode=Mode.PRIVATE)
    add(boss_extrude18_tool1.solids().sort_by(Axis((2, 40, -2), (0, 0, -1)))[0])

    # Fillet9
    fillet9_edges = [body_2_1.edges().sort_by_distance(p)[0] for p in [
        (1, 35, -13.3),
        (1, 45, -13.3),
        (3, 45, -13.3),
        (3, 35, -13.3),
    ]]
    fillet(fillet9_edges, radius=FILLET9_R)


solid = body_2_1.part
